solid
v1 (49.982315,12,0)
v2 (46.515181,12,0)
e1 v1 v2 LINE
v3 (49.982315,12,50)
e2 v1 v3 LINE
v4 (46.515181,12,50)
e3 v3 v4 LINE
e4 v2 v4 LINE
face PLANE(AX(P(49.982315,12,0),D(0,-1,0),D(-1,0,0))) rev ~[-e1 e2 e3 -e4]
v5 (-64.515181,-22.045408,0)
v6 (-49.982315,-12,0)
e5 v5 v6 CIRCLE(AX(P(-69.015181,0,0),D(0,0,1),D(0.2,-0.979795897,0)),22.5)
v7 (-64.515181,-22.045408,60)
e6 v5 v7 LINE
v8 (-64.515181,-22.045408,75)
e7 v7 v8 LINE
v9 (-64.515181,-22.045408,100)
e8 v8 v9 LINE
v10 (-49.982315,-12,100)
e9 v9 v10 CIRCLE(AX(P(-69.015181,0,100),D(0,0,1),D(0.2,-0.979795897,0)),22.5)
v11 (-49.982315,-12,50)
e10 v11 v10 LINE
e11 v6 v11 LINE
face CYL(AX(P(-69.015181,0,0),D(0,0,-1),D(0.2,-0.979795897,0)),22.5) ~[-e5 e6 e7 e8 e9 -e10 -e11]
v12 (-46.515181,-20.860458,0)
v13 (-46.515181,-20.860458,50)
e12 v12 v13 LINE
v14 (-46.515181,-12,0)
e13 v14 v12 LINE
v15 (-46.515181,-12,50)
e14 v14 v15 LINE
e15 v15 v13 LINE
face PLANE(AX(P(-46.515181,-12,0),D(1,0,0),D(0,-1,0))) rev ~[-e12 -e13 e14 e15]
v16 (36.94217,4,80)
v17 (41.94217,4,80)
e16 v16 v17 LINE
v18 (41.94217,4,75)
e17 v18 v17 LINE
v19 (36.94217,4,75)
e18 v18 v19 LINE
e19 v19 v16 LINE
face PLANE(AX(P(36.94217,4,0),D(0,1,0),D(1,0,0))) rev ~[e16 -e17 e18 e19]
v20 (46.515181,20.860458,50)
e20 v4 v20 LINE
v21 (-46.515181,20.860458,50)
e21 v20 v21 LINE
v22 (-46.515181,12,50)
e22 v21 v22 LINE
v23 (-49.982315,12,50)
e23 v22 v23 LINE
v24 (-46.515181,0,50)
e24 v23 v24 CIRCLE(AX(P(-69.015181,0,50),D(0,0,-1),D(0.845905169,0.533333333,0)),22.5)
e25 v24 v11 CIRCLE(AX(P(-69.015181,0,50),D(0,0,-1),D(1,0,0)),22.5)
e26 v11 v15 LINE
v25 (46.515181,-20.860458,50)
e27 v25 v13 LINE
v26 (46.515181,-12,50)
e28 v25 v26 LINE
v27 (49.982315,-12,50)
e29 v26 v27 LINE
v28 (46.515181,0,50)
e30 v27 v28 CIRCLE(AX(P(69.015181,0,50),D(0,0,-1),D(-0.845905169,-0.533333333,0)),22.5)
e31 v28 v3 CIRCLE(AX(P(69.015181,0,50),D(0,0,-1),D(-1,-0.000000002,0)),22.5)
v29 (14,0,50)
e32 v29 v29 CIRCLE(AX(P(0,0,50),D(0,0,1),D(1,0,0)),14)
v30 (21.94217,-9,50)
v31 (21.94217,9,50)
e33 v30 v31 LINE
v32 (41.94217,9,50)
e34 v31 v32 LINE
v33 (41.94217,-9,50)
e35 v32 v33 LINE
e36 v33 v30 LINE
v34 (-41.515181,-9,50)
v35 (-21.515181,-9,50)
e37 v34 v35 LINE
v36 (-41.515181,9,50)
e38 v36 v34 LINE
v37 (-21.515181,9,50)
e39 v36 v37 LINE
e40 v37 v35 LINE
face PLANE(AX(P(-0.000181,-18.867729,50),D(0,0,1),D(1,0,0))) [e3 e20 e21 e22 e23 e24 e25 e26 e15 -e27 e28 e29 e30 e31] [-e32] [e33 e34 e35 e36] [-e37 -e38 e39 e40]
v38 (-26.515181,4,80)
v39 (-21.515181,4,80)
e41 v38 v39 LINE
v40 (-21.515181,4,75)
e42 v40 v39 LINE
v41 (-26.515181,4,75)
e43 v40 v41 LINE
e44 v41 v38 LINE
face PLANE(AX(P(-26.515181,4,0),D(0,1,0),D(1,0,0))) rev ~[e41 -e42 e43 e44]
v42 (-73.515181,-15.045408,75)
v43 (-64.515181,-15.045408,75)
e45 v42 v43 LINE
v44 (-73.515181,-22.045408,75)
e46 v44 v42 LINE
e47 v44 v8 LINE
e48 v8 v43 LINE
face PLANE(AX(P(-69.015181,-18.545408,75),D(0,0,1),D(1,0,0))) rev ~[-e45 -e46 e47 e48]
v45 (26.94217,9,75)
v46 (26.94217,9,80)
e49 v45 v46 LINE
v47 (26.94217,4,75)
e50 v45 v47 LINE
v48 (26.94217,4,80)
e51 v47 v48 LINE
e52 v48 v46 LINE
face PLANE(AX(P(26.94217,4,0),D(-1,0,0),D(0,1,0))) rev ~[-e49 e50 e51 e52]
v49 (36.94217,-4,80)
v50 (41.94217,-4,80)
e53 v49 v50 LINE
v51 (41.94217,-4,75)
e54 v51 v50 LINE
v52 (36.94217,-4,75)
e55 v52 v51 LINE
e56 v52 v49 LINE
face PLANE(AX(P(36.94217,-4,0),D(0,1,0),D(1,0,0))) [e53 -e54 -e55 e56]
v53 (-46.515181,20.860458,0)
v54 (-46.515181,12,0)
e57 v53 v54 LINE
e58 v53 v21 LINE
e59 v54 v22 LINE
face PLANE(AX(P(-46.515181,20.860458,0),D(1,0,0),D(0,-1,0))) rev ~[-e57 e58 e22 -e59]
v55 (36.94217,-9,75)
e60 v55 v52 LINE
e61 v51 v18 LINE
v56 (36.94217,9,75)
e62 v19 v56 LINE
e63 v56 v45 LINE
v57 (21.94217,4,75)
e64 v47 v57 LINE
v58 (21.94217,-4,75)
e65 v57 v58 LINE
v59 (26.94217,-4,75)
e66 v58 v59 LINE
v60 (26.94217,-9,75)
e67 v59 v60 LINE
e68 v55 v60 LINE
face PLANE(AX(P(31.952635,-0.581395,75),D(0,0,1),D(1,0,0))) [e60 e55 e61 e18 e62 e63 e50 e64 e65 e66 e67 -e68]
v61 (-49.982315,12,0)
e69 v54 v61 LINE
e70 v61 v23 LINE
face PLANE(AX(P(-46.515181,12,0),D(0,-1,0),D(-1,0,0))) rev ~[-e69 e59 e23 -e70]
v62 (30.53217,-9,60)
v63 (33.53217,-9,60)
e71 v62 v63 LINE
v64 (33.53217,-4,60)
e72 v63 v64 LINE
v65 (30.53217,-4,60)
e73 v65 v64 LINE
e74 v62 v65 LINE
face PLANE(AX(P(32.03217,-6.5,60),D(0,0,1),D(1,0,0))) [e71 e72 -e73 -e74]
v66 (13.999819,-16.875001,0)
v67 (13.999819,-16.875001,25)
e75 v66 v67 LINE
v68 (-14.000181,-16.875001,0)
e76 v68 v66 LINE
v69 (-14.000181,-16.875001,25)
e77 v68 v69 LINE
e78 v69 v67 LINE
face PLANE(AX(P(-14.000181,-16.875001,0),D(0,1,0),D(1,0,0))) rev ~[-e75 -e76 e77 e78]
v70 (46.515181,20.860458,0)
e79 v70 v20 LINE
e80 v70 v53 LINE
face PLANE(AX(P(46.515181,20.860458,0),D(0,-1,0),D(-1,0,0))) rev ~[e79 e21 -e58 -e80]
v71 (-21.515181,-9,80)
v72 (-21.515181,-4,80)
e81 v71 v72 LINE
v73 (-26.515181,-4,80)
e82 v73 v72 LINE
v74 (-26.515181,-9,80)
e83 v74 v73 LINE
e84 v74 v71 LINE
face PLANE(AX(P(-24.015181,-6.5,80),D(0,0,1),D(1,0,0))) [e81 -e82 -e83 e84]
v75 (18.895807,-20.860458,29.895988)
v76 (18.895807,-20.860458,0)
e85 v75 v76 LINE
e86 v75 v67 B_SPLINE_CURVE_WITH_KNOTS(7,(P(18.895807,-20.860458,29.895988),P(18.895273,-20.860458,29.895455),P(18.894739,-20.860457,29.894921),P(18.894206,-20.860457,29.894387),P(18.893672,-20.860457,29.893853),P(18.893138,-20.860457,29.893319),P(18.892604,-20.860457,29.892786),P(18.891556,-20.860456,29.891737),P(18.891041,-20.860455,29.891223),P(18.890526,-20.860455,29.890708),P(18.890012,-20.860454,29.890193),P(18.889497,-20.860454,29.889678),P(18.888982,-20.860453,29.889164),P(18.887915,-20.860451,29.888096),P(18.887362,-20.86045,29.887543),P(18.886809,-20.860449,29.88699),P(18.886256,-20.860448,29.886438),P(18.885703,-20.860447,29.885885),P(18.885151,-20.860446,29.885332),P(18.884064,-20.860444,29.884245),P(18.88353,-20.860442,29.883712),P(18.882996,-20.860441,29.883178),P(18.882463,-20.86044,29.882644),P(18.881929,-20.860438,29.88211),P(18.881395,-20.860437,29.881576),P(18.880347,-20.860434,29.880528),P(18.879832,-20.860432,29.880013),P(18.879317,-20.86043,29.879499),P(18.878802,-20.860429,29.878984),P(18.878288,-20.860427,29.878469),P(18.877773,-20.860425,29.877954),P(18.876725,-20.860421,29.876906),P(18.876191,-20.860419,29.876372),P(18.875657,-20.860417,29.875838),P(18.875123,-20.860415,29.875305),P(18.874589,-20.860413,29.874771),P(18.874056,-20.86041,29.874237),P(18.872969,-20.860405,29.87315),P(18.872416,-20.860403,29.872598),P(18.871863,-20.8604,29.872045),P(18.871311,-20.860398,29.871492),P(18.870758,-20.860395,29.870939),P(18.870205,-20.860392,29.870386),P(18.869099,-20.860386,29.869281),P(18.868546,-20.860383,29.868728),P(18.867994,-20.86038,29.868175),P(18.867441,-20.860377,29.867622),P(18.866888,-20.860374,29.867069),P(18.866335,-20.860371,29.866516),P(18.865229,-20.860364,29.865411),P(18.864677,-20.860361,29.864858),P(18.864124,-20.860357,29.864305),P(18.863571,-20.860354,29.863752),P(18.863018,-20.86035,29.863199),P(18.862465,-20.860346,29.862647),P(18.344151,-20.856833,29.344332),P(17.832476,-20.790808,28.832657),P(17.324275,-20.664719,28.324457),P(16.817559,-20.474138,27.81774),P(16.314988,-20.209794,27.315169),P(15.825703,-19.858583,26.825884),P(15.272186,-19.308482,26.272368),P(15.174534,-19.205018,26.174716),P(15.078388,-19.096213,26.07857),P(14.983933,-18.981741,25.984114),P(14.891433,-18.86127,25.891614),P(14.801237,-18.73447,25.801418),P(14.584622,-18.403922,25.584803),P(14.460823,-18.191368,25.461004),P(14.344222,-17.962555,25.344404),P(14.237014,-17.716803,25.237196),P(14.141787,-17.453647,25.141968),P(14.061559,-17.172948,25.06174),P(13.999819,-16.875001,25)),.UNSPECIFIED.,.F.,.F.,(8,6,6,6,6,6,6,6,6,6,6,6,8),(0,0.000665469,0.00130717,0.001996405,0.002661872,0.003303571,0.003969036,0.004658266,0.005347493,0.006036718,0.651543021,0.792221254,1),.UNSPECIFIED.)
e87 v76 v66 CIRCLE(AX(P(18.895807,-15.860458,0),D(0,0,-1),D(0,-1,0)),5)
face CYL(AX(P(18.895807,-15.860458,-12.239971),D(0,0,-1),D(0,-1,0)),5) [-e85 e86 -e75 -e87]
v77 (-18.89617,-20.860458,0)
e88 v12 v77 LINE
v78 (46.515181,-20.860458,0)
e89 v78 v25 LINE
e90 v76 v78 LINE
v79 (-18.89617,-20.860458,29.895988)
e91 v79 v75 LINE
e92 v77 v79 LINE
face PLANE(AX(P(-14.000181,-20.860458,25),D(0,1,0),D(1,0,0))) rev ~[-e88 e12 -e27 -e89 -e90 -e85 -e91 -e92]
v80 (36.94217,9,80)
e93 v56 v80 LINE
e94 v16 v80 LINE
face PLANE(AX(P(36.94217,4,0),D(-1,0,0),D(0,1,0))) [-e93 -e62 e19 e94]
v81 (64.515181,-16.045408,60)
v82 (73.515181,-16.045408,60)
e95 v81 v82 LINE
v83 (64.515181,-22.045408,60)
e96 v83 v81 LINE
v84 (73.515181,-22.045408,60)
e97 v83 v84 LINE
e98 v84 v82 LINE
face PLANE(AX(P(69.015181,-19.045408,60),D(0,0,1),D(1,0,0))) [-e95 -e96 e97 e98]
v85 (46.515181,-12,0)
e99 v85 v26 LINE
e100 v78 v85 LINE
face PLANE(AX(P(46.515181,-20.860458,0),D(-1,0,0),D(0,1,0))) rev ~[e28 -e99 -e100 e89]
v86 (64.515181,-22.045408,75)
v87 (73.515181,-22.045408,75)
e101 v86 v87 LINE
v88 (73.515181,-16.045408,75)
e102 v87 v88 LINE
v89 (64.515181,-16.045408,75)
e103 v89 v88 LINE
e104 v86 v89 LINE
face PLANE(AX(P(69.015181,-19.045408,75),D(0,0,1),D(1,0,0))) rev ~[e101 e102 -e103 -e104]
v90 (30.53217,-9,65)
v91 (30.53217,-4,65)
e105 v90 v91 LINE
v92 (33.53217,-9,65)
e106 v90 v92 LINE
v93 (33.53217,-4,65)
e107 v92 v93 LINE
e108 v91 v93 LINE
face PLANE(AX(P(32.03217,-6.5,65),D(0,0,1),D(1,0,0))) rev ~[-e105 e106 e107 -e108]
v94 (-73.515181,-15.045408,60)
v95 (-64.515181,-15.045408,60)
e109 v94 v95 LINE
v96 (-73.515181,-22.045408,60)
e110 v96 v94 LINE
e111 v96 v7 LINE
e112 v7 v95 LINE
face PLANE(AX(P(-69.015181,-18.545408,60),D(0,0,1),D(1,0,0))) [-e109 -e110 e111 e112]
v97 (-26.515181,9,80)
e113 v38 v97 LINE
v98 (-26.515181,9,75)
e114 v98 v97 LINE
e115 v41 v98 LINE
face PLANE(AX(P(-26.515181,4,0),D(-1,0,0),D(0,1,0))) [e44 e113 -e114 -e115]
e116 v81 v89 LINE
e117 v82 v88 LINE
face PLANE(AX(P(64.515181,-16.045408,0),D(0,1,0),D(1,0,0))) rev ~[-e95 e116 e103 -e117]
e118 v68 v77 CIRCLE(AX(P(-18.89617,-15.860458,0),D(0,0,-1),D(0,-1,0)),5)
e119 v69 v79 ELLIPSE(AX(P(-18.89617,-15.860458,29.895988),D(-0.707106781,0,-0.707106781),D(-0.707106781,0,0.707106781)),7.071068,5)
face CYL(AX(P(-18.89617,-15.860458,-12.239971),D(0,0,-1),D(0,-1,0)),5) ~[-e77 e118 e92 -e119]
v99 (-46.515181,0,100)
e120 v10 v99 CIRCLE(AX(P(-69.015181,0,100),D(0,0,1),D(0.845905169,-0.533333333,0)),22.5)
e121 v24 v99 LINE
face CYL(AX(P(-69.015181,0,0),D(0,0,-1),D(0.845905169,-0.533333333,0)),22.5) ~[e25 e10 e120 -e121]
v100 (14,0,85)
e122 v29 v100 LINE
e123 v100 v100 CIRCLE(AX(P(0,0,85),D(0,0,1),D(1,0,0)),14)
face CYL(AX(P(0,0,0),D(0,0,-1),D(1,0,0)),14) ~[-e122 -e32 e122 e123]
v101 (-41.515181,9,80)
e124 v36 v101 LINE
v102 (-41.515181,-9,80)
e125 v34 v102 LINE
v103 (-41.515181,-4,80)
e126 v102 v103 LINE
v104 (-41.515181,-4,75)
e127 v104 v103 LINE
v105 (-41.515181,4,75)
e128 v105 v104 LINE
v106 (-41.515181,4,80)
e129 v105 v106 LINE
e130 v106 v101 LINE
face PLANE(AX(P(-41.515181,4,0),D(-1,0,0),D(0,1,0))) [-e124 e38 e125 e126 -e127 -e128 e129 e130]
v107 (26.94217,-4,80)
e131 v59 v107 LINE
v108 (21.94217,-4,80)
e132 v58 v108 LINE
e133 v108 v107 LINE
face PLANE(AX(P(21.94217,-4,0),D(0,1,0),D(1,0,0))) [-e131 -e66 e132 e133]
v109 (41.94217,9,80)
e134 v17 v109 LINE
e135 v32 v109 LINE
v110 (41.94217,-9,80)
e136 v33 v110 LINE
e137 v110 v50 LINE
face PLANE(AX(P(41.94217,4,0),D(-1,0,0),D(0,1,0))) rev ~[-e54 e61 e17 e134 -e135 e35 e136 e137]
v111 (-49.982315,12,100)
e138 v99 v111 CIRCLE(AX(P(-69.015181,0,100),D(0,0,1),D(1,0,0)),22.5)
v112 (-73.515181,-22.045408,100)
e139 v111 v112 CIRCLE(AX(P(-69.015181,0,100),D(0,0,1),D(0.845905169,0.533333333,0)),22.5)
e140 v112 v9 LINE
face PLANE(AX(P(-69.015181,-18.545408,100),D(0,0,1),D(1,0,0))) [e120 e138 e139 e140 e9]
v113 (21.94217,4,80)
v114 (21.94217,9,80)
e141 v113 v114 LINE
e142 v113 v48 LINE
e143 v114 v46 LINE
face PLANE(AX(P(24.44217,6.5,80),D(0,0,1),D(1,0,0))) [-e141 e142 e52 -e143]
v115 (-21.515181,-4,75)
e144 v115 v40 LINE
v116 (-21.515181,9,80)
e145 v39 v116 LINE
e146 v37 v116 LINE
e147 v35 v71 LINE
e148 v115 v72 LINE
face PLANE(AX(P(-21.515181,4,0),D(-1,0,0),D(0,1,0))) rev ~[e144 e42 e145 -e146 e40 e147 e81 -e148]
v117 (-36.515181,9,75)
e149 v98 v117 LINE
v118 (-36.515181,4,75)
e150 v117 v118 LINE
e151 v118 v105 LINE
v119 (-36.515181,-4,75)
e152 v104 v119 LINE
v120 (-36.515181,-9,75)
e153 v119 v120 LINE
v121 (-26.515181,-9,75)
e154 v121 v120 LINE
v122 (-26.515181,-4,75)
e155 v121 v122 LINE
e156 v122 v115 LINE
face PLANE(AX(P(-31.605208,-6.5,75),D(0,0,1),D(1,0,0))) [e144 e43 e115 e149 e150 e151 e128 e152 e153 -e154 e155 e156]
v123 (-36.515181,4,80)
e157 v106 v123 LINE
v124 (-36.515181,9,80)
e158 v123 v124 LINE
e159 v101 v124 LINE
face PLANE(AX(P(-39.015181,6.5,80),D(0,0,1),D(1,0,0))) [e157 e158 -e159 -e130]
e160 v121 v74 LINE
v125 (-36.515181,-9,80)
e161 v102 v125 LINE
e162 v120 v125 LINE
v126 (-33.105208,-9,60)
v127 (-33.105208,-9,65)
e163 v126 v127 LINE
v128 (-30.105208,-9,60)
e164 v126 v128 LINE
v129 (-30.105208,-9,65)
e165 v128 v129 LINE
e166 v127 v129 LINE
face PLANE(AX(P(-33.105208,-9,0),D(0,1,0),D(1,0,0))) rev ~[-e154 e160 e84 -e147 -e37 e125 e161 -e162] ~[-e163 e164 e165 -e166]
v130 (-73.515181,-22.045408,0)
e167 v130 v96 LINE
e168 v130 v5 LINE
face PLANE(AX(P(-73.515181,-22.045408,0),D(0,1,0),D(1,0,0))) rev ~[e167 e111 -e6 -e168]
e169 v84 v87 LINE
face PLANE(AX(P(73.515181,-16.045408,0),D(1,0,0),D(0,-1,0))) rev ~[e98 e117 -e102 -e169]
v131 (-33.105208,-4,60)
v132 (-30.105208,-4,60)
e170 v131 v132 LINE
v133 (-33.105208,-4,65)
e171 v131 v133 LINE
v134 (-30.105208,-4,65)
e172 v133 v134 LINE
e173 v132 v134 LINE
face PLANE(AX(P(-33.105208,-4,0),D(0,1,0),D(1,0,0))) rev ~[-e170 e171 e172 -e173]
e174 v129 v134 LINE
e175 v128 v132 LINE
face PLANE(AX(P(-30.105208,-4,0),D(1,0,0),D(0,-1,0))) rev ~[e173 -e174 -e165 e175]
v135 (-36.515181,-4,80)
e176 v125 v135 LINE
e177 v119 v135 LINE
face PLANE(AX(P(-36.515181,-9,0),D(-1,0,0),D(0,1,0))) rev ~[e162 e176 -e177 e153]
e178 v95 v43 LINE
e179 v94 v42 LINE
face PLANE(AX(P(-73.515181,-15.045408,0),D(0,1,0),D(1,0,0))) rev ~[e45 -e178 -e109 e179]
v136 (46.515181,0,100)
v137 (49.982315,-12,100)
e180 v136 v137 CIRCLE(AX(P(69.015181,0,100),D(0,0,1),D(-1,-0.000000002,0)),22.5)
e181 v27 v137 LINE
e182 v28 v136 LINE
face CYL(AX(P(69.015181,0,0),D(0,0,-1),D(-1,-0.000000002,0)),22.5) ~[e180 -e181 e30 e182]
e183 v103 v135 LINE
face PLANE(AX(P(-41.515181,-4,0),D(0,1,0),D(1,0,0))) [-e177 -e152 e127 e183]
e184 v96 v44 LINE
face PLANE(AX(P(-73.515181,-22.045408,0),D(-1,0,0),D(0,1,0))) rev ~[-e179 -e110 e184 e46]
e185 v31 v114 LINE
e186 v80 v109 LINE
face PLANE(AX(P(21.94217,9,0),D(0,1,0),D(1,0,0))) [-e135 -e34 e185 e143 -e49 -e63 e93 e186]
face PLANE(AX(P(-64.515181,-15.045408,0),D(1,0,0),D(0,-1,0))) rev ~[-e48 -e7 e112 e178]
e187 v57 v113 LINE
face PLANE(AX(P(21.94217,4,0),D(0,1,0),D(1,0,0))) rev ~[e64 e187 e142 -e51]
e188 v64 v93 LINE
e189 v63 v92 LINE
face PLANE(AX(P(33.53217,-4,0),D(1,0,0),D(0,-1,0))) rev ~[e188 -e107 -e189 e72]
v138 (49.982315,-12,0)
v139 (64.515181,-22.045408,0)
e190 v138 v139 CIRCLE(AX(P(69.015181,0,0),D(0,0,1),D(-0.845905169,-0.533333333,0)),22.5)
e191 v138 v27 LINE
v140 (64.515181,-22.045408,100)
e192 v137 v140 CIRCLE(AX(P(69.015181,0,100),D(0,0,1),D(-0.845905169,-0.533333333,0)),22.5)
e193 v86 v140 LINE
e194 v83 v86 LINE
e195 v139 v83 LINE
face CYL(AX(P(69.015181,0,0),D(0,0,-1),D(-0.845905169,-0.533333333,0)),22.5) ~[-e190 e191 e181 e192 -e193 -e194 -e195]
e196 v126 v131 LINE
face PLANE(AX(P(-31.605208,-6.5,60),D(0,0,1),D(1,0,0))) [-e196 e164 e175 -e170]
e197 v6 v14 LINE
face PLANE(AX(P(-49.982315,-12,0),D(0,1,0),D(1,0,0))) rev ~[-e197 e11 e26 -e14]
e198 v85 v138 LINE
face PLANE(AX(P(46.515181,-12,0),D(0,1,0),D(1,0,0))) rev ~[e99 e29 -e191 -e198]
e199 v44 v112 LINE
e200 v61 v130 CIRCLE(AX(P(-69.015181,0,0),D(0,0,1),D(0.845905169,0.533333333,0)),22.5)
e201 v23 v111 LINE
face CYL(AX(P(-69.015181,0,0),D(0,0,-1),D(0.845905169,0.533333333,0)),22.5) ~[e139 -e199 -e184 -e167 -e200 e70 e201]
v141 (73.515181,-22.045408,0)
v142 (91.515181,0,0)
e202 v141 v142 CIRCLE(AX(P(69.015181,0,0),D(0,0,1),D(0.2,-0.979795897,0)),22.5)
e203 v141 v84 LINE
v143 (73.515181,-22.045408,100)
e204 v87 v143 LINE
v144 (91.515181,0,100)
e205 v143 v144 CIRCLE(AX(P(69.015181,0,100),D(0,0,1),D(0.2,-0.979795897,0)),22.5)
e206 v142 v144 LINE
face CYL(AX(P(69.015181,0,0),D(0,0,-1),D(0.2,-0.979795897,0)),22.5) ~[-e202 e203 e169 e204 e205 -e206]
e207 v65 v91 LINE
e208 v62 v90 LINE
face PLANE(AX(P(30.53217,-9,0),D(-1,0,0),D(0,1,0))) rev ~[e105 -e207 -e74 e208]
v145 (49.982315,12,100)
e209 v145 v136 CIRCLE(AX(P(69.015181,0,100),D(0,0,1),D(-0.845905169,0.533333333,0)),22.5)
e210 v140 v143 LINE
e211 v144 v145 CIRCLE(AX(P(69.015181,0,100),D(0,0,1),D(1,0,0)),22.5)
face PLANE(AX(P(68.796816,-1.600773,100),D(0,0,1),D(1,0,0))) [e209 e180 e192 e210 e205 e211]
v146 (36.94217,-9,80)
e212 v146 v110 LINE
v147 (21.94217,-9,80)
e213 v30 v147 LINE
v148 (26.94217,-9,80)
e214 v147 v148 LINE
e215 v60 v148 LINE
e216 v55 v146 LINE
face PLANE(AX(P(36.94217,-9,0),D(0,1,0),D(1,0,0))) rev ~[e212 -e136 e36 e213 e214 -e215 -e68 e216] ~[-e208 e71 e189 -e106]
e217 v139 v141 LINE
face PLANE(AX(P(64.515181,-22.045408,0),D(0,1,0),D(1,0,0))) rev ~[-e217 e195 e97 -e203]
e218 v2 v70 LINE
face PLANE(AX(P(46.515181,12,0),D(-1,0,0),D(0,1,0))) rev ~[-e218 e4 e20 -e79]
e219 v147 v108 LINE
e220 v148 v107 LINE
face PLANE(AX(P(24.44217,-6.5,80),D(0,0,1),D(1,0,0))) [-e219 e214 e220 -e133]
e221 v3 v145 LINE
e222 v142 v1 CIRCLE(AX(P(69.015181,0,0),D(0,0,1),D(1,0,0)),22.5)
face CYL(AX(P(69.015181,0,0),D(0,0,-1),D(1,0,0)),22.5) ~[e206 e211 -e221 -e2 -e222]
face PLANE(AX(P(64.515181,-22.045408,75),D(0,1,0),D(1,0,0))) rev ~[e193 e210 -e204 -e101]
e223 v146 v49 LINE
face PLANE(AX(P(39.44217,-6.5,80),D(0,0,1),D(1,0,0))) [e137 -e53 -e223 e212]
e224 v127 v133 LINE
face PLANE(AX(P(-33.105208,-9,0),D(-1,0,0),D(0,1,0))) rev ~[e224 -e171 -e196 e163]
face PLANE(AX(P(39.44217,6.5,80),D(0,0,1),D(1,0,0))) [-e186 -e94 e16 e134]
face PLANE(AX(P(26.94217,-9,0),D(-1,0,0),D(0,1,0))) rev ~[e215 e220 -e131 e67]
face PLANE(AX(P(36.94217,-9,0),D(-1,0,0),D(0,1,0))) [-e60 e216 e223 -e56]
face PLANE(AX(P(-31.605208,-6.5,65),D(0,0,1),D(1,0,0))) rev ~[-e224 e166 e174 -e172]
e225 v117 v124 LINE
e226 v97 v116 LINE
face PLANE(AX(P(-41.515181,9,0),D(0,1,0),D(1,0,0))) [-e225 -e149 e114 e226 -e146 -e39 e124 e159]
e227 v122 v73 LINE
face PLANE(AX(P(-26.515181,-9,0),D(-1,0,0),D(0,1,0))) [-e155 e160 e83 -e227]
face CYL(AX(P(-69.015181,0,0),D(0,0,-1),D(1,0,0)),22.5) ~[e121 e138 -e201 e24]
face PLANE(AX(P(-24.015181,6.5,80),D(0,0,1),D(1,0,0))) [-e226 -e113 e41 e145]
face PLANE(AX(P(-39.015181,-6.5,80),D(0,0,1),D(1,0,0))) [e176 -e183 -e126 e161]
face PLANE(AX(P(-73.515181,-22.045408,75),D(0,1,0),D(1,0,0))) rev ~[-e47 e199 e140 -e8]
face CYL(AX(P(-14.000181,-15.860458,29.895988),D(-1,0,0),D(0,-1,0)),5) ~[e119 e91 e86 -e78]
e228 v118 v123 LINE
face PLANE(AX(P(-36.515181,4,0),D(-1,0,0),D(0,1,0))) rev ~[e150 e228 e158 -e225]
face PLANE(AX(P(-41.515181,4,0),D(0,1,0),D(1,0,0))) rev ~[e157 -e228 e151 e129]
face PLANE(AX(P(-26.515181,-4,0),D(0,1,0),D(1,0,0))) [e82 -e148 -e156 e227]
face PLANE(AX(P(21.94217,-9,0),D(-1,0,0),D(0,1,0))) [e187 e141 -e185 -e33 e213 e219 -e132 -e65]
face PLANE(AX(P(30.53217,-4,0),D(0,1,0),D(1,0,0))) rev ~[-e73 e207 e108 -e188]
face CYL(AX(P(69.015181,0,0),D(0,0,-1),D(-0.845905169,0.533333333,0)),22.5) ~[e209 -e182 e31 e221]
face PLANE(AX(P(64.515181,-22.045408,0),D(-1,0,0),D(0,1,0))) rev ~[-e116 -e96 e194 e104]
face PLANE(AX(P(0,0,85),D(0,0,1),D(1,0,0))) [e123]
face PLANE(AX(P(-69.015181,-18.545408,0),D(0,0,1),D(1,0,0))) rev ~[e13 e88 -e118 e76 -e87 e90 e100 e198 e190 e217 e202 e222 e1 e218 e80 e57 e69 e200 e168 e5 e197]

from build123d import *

# Parameters (mm, degrees)
F1_DEPTH     = 100
F0_R         = 14
F2_DEPTH     = 50
F3_DEPTH     = 75
F4_DEPTH     = 85
F0_W         = 5
F0_H         = 5
F5_DEPTH     = 80
F6_START     = 25
F0_W_2       = 28
F0_H_2       = 3.9854568298
F6_DEPTH     = 25
F7_START     = 75
F0_W_3       = 9
F0_H_3       = 7
F0_H_4       = 6
F7_DEPTH     = 25
F8_DEPTH     = 60
F9_T1_DEPTH  = 28
F9_T3_DEPTH  = 37.2399709343
F9_T9_DEPTH  = 40.2399709343
F9_T13_DEPTH = 37.2399709343
F9_T20_DEPTH = 37.2399709343
F9_T24_DEPTH = 40.2399709343
F10_START    = 65
F0_W_4       = 3
F10_DEPTH    = 10
F11_DEPTH    = 60


# Not quite as in the source:
# - a fillet or chamfer that OpenCascade refuses, or shapes differently, is made with other operations: its cross-section is extruded or revolved along the edge and cut away or added
# - a feature names something its author has since deleted; it is built from what else it names


with BuildPart() as f1:
    # F0 (on Top) → F1 (new body)
    with BuildSketch(Plane.XY):
        with BuildLine():
            ThreePointArc((-49.982315052, -12), (-47.3993365724, -6.2454186413), (-46.5151813626, 0))
            ThreePointArc((-46.5151813626, 0), (-47.3993365724, 6.2454186413), (-49.982315052, 12))
            ThreePointArc((-49.982315052, 12), (-87.5239224573, 12.7936118078), (-73.5151813626, -22.045407685))
            Line((-73.5151813626, -22.045407685), (-73.5151813626, -15.045407685))
            Line((-73.5151813626, -15.045407685), (-64.5151813626, -15.045407685))
            Line((-64.5151813626, -15.045407685), (-64.5151813626, -22.045407685))
            ThreePointArc((-64.5151813626, -22.045407685), (-56.2215695548, -18.5087410947), (-49.982315052, -12))
        make_face()
    extrude(amount=F1_DEPTH)



with BuildPart() as f1b:
    # F0 (on Top) → F1, piece 2 (new body)
    with BuildSketch(Plane.XY):
        with BuildLine():
            ThreePointArc((49.982315052, 12), (47.3993365677, 6.2454186249), (46.5151813626, -3.41e-08))
            ThreePointArc((46.5151813626, -3.41e-08), (47.3993365771, -6.2454186577), (49.982315052, -12))
            ThreePointArc((49.982315052, -12), (56.2215695548, -18.5087410947), (64.5151813626, -22.045407685))
            Line((64.5151813626, -22.045407685), (64.5151813626, -16.045407685))
            Line((64.5151813626, -16.045407685), (73.5151813626, -16.045407685))
            Line((73.5151813626, -16.045407685), (73.5151813626, -22.045407685))
            ThreePointArc((73.5151813626, -22.045407685), (86.4436064206, -14.2302494708), (91.5151813626, 0))
            ThreePointArc((91.5151813626, 0), (75.2606000039, 21.6158447902), (49.982315052, 12))
        make_face()
    extrude(amount=F1_DEPTH)


with BuildPart() as f1_1:
    add(f1.part)

    add(f1b.part)  # F2 merges F1b
    # F0 (on Top) → F2 (join)
    with BuildSketch(Plane.XY):
        Polygon((46.5151813626, 12), (46.5151813626, 20.8604575003), (-46.5151813626, 20.8604575003), (-46.5151813626, 12), (-46.5151813626, 0), (-46.5151813626, -12), (-46.5151813626, -20.8604575003), (-14.0001813626, -20.8604575003), (-14.0001813626, -16.8750006706), (13.9998186374, -16.8750006706), (13.9998186374, -20.8604575003), (46.5151813626, -20.8604575003), (46.5151813626, -12), (46.5151813626, -3.41e-08), align=None)
        Polygon((-26.5151813626, 9), (-21.5151813626, 9), (-21.5151813626, 4), (-21.5151813626, -4), (-21.5151813626, -9), (-26.5151813626, -9), (-30.1052076072, -9), (-33.1052076072, -9), (-36.5151813626, -9), (-41.5151813626, -9), (-41.5151813626, -4), (-41.5151813626, 4), (-41.5151813626, 9), (-36.5151813626, 9), align=None, mode=Mode.SUBTRACT)
        Circle(F0_R, mode=Mode.SUBTRACT)
        Polygon((36.9421700871, 9), (41.9421700871, 9), (41.9421700871, 4), (41.9421700871, -4), (41.9421700871, -9), (36.9421700871, -9), (33.5321700871, -9), (30.5321700871, -9), (26.9421700871, -9), (21.9421700871, -9), (21.9421700871, -4), (21.9421700871, 4), (21.9421700871, 9), (26.9421700871, 9), align=None, mode=Mode.SUBTRACT)
        with BuildLine():
            Line((-46.5151813626, -12), (-46.5151813626, 0))
            ThreePointArc((-46.5151813626, 0), (-47.3993365724, -6.2454186413), (-49.982315052, -12))
            Line((-49.982315052, -12), (-46.5151813626, -12))
        make_face()
        with BuildLine():
            Line((-46.5151813626, 0), (-46.5151813626, 12))
            Line((-46.5151813626, 12), (-49.982315052, 12))
            ThreePointArc((-49.982315052, 12), (-47.3993365724, 6.2454186413), (-46.5151813626, 0))
        make_face()
        with BuildLine():
            ThreePointArc((49.982315052, -12), (47.3993365771, -6.2454186577), (46.5151813626, -3.41e-08))
            Line((46.5151813626, -3.41e-08), (46.5151813626, -12))
            Line((46.5151813626, -12), (49.982315052, -12))
        make_face()
        with BuildLine():
            Line((49.982315052, 12), (46.5151813626, 12))
            Line((46.5151813626, 12), (46.5151813626, -3.41e-08))
            ThreePointArc((46.5151813626, -3.41e-08), (47.3993365677, 6.2454186249), (49.982315052, 12))
        make_face()
    extrude(amount=F2_DEPTH)

    # F0 (on Top) → F3 (join)
    with BuildSketch(Plane.XY):
        Polygon((36.9421700871, 4), (36.9421700871, 9), (26.9421700871, 9), (26.9421700871, 4), (21.9421700871, 4), (21.9421700871, -4), (26.9421700871, -4), (26.9421700871, -9), (30.5321700871, -9), (30.5321700871, -4), (33.5321700871, -4), (33.5321700871, -9), (36.9421700871, -9), (36.9421700871, -4), (41.9421700871, -4), (41.9421700871, 4), align=None)
        Polygon((-26.5151813626, 4), (-26.5151813626, 9), (-36.5151813626, 9), (-36.5151813626, 4), (-41.5151813626, 4), (-41.5151813626, -4), (-36.5151813626, -4), (-36.5151813626, -9), (-33.1052076072, -9), (-33.1052076072, -4), (-30.1052076072, -4), (-30.1052076072, -9), (-26.5151813626, -9), (-26.5151813626, -4), (-21.5151813626, -4), (-21.5151813626, 4), align=None)
    extrude(amount=F3_DEPTH)

    # F0 (on Top) → F4 (join)
    with BuildSketch(Plane.XY):
        Circle(F0_R)
    extrude(amount=F4_DEPTH)

    # F0 (on Top) → F5 (join)
    with BuildSketch(Plane.XY):
        with Locations((-39.0151813626, 6.5)):
            Rectangle(F0_W, F0_H)
        with Locations((-39.0151813626, -6.5)):
            Rectangle(F0_W, F0_H)
        with Locations((-24.0151813626, -6.5)):
            Rectangle(F0_W, F0_H)
        with Locations((-24.0151813626, 6.5)):
            Rectangle(F0_W, F0_H)
        with Locations((24.4421700871, -6.5)):
            Rectangle(F0_W, F0_H)
        with Locations((39.4421700871, -6.5)):
            Rectangle(F0_W, F0_H)
        with Locations((39.4421700871, 6.5)):
            Rectangle(F0_W, F0_H)
        with Locations((24.4421700871, 6.5)):
            Rectangle(F0_W, F0_H)
    extrude(amount=F5_DEPTH)

    # F0 (on Top) → F6 (join)
    with BuildSketch(Plane.XY.offset(F6_START)):
        with Locations((-0.0001813626, -18.8677290854)):
            Rectangle(F0_W_2, F0_H_2)
    extrude(amount=F6_DEPTH)

    # F0 (on Top) → F7 (join)
    with BuildSketch(Plane.XY.offset(F7_START)):
        with Locations((-69.0151813626, -18.545407685)):
            Rectangle(F0_W_3, F0_H_3)
        with Locations((69.0151813626, -19.045407685)):
            Rectangle(F0_W_3, F0_H_4)
    extrude(amount=F7_DEPTH)

    # F0 (on Top) → F8 (join)
    with BuildSketch(Plane.XY):
        with Locations((-69.0151813626, -18.545407685)):
            Rectangle(F0_W_3, F0_H_3)
        with Locations((69.0151813626, -19.045407685)):
            Rectangle(F0_W_3, F0_H_4)
    extrude(amount=F8_DEPTH)

    # F9: fillet of radius 5 on 3 edges, made by hand

    # F9_s2 → F9_t1 (cut)
    with BuildSketch(Plane.YZ.offset(-14.0001813626)):
        with BuildLine():
            ThreePointArc((-20.8604575003, 29.8959883737), (-19.7381317937, 26.7394646412), (-16.8750006706, 25))
            Line((-16.8750006706, 25), (-20.8604575003, 25))
            Line((-20.8604575003, 25), (-20.8604575003, 29.8959883737))
        make_face()
    extrude(amount=F9_T1_DEPTH, mode=Mode.SUBTRACT)

    # F9_s4 → F9_t3 (cut)
    with BuildSketch(Plane.XY.offset(-12.2399709343)):
        with BuildLine():
            ThreePointArc((-18.8961697364, -20.8604575003), (-15.7396460038, -19.7381317937), (-14.0001813626, -16.8750006706))
            Line((-14.0001813626, -16.8750006706), (-14.0001813626, -20.8604575003))
            Line((-14.0001813626, -20.8604575003), (-18.8961697364, -20.8604575003))
        make_face()
        with BuildLine():
            ThreePointArc((18.8958070111, -20.8604575003), (15.7392832785, -19.7381317937), (13.9998186374, -16.8750006706))
            Line((13.9998186374, -16.8750006706), (13.9998186374, -20.8604575003))
            Line((13.9998186374, -20.8604575003), (18.8958070111, -20.8604575003))
        make_face()
    extrude(amount=F9_T3_DEPTH, mode=Mode.SUBTRACT)


with BuildPart() as f9_tool7:
    # F9_s8 → F9_t9 (new body)
    with BuildSketch(Plane.YZ.offset(-26.240152297)):
        with BuildLine():
            ThreePointArc((-20.8604575003, 29.8959883737), (-19.7381317937, 26.7394646412), (-16.8750006706, 25))
            Line((-16.8750006706, 25), (-20.8604575003, 25))
            Line((-20.8604575003, 25), (-20.8604575003, 29.8959883737))
        make_face()
    extrude(amount=F9_T9_DEPTH)

    split(bisect_by=Plane.YZ.offset(-14.0001813626), keep=Keep.BOTTOM)


with BuildPart() as f9_tool11:
    # F9_s12 → F9_t13 (new body)
    with BuildSketch(Plane.XY):
        with BuildLine():
            ThreePointArc((-18.8961697364, -20.8604575003), (-15.7396460038, -19.7381317937), (-14.0001813626, -16.8750006706))
            Line((-14.0001813626, -16.8750006706), (-14.0001813626, -20.8604575003))
            Line((-14.0001813626, -20.8604575003), (-18.8961697364, -20.8604575003))
        make_face()
    extrude(amount=F9_T13_DEPTH)

    split(bisect_by=Plane.XY.offset(25), keep=Keep.TOP)


with BuildPart() as f9_tool7_1:
    add(f9_tool7.part)

    # F9_t15: intersect F9_tool11
    add(f9_tool11.part, mode=Mode.INTERSECT)


with BuildPart() as f1_2:
    add(f1_1.part)

    # F9_t5: cut F9_tool7
    add(f9_tool7_1.part, mode=Mode.SUBTRACT)


with BuildPart() as f9_tool18:
    # F9_s19 → F9_t20 (new body)
    with BuildSketch(Plane.XY):
        with BuildLine():
            ThreePointArc((18.8958070111, -20.8604575003), (15.7392832785, -19.7381317937), (13.9998186374, -16.8750006706))
            Line((13.9998186374, -16.8750006706), (13.9998186374, -20.8604575003))
            Line((13.9998186374, -20.8604575003), (18.8958070111, -20.8604575003))
        make_face()
    extrude(amount=F9_T20_DEPTH)

    split(bisect_by=Plane.XY.offset(25), keep=Keep.TOP)


with BuildPart() as f9_tool22:
    # F9_s23 → F9_t24 (new body)
    with BuildSketch(Plane.YZ.offset(-14.0001813626)):
        with BuildLine():
            ThreePointArc((-20.8604575003, 29.8959883737), (-19.7381317937, 26.7394646412), (-16.8750006706, 25))
            Line((-16.8750006706, 25), (-20.8604575003, 25))
            Line((-20.8604575003, 25), (-20.8604575003, 29.8959883737))
        make_face()
    extrude(amount=F9_T24_DEPTH)

    split(bisect_by=Plane.YZ.offset(13.9998186374), keep=Keep.TOP)


with BuildPart() as f9_tool18_1:
    add(f9_tool18.part)

    # F9_t26: intersect F9_tool22
    add(f9_tool22.part, mode=Mode.INTERSECT)


with BuildPart() as f1_3:
    add(f1_2.part)

    # F9_t16: cut F9_tool18
    add(f9_tool18_1.part, mode=Mode.SUBTRACT)

    # F0 (on Top) → F10 (join)
    with BuildSketch(Plane.XY.offset(F10_START)):
        with Locations((-31.6052076072, -6.5)):
            Rectangle(F0_W_4, F0_H)
        with Locations((32.0321700871, -6.5)):
            Rectangle(F0_W_4, F0_H)
    extrude(amount=F10_DEPTH)

    # F0 (on Top) → F11 (join)
    with BuildSketch(Plane.XY):
        with Locations((-31.6052076072, -6.5)):
            Rectangle(F0_W_4, F0_H)
        with Locations((32.0321700871, -6.5)):
            Rectangle(F0_W_4, F0_H)
    extrude(amount=F11_DEPTH)


solid = f1_3.part
